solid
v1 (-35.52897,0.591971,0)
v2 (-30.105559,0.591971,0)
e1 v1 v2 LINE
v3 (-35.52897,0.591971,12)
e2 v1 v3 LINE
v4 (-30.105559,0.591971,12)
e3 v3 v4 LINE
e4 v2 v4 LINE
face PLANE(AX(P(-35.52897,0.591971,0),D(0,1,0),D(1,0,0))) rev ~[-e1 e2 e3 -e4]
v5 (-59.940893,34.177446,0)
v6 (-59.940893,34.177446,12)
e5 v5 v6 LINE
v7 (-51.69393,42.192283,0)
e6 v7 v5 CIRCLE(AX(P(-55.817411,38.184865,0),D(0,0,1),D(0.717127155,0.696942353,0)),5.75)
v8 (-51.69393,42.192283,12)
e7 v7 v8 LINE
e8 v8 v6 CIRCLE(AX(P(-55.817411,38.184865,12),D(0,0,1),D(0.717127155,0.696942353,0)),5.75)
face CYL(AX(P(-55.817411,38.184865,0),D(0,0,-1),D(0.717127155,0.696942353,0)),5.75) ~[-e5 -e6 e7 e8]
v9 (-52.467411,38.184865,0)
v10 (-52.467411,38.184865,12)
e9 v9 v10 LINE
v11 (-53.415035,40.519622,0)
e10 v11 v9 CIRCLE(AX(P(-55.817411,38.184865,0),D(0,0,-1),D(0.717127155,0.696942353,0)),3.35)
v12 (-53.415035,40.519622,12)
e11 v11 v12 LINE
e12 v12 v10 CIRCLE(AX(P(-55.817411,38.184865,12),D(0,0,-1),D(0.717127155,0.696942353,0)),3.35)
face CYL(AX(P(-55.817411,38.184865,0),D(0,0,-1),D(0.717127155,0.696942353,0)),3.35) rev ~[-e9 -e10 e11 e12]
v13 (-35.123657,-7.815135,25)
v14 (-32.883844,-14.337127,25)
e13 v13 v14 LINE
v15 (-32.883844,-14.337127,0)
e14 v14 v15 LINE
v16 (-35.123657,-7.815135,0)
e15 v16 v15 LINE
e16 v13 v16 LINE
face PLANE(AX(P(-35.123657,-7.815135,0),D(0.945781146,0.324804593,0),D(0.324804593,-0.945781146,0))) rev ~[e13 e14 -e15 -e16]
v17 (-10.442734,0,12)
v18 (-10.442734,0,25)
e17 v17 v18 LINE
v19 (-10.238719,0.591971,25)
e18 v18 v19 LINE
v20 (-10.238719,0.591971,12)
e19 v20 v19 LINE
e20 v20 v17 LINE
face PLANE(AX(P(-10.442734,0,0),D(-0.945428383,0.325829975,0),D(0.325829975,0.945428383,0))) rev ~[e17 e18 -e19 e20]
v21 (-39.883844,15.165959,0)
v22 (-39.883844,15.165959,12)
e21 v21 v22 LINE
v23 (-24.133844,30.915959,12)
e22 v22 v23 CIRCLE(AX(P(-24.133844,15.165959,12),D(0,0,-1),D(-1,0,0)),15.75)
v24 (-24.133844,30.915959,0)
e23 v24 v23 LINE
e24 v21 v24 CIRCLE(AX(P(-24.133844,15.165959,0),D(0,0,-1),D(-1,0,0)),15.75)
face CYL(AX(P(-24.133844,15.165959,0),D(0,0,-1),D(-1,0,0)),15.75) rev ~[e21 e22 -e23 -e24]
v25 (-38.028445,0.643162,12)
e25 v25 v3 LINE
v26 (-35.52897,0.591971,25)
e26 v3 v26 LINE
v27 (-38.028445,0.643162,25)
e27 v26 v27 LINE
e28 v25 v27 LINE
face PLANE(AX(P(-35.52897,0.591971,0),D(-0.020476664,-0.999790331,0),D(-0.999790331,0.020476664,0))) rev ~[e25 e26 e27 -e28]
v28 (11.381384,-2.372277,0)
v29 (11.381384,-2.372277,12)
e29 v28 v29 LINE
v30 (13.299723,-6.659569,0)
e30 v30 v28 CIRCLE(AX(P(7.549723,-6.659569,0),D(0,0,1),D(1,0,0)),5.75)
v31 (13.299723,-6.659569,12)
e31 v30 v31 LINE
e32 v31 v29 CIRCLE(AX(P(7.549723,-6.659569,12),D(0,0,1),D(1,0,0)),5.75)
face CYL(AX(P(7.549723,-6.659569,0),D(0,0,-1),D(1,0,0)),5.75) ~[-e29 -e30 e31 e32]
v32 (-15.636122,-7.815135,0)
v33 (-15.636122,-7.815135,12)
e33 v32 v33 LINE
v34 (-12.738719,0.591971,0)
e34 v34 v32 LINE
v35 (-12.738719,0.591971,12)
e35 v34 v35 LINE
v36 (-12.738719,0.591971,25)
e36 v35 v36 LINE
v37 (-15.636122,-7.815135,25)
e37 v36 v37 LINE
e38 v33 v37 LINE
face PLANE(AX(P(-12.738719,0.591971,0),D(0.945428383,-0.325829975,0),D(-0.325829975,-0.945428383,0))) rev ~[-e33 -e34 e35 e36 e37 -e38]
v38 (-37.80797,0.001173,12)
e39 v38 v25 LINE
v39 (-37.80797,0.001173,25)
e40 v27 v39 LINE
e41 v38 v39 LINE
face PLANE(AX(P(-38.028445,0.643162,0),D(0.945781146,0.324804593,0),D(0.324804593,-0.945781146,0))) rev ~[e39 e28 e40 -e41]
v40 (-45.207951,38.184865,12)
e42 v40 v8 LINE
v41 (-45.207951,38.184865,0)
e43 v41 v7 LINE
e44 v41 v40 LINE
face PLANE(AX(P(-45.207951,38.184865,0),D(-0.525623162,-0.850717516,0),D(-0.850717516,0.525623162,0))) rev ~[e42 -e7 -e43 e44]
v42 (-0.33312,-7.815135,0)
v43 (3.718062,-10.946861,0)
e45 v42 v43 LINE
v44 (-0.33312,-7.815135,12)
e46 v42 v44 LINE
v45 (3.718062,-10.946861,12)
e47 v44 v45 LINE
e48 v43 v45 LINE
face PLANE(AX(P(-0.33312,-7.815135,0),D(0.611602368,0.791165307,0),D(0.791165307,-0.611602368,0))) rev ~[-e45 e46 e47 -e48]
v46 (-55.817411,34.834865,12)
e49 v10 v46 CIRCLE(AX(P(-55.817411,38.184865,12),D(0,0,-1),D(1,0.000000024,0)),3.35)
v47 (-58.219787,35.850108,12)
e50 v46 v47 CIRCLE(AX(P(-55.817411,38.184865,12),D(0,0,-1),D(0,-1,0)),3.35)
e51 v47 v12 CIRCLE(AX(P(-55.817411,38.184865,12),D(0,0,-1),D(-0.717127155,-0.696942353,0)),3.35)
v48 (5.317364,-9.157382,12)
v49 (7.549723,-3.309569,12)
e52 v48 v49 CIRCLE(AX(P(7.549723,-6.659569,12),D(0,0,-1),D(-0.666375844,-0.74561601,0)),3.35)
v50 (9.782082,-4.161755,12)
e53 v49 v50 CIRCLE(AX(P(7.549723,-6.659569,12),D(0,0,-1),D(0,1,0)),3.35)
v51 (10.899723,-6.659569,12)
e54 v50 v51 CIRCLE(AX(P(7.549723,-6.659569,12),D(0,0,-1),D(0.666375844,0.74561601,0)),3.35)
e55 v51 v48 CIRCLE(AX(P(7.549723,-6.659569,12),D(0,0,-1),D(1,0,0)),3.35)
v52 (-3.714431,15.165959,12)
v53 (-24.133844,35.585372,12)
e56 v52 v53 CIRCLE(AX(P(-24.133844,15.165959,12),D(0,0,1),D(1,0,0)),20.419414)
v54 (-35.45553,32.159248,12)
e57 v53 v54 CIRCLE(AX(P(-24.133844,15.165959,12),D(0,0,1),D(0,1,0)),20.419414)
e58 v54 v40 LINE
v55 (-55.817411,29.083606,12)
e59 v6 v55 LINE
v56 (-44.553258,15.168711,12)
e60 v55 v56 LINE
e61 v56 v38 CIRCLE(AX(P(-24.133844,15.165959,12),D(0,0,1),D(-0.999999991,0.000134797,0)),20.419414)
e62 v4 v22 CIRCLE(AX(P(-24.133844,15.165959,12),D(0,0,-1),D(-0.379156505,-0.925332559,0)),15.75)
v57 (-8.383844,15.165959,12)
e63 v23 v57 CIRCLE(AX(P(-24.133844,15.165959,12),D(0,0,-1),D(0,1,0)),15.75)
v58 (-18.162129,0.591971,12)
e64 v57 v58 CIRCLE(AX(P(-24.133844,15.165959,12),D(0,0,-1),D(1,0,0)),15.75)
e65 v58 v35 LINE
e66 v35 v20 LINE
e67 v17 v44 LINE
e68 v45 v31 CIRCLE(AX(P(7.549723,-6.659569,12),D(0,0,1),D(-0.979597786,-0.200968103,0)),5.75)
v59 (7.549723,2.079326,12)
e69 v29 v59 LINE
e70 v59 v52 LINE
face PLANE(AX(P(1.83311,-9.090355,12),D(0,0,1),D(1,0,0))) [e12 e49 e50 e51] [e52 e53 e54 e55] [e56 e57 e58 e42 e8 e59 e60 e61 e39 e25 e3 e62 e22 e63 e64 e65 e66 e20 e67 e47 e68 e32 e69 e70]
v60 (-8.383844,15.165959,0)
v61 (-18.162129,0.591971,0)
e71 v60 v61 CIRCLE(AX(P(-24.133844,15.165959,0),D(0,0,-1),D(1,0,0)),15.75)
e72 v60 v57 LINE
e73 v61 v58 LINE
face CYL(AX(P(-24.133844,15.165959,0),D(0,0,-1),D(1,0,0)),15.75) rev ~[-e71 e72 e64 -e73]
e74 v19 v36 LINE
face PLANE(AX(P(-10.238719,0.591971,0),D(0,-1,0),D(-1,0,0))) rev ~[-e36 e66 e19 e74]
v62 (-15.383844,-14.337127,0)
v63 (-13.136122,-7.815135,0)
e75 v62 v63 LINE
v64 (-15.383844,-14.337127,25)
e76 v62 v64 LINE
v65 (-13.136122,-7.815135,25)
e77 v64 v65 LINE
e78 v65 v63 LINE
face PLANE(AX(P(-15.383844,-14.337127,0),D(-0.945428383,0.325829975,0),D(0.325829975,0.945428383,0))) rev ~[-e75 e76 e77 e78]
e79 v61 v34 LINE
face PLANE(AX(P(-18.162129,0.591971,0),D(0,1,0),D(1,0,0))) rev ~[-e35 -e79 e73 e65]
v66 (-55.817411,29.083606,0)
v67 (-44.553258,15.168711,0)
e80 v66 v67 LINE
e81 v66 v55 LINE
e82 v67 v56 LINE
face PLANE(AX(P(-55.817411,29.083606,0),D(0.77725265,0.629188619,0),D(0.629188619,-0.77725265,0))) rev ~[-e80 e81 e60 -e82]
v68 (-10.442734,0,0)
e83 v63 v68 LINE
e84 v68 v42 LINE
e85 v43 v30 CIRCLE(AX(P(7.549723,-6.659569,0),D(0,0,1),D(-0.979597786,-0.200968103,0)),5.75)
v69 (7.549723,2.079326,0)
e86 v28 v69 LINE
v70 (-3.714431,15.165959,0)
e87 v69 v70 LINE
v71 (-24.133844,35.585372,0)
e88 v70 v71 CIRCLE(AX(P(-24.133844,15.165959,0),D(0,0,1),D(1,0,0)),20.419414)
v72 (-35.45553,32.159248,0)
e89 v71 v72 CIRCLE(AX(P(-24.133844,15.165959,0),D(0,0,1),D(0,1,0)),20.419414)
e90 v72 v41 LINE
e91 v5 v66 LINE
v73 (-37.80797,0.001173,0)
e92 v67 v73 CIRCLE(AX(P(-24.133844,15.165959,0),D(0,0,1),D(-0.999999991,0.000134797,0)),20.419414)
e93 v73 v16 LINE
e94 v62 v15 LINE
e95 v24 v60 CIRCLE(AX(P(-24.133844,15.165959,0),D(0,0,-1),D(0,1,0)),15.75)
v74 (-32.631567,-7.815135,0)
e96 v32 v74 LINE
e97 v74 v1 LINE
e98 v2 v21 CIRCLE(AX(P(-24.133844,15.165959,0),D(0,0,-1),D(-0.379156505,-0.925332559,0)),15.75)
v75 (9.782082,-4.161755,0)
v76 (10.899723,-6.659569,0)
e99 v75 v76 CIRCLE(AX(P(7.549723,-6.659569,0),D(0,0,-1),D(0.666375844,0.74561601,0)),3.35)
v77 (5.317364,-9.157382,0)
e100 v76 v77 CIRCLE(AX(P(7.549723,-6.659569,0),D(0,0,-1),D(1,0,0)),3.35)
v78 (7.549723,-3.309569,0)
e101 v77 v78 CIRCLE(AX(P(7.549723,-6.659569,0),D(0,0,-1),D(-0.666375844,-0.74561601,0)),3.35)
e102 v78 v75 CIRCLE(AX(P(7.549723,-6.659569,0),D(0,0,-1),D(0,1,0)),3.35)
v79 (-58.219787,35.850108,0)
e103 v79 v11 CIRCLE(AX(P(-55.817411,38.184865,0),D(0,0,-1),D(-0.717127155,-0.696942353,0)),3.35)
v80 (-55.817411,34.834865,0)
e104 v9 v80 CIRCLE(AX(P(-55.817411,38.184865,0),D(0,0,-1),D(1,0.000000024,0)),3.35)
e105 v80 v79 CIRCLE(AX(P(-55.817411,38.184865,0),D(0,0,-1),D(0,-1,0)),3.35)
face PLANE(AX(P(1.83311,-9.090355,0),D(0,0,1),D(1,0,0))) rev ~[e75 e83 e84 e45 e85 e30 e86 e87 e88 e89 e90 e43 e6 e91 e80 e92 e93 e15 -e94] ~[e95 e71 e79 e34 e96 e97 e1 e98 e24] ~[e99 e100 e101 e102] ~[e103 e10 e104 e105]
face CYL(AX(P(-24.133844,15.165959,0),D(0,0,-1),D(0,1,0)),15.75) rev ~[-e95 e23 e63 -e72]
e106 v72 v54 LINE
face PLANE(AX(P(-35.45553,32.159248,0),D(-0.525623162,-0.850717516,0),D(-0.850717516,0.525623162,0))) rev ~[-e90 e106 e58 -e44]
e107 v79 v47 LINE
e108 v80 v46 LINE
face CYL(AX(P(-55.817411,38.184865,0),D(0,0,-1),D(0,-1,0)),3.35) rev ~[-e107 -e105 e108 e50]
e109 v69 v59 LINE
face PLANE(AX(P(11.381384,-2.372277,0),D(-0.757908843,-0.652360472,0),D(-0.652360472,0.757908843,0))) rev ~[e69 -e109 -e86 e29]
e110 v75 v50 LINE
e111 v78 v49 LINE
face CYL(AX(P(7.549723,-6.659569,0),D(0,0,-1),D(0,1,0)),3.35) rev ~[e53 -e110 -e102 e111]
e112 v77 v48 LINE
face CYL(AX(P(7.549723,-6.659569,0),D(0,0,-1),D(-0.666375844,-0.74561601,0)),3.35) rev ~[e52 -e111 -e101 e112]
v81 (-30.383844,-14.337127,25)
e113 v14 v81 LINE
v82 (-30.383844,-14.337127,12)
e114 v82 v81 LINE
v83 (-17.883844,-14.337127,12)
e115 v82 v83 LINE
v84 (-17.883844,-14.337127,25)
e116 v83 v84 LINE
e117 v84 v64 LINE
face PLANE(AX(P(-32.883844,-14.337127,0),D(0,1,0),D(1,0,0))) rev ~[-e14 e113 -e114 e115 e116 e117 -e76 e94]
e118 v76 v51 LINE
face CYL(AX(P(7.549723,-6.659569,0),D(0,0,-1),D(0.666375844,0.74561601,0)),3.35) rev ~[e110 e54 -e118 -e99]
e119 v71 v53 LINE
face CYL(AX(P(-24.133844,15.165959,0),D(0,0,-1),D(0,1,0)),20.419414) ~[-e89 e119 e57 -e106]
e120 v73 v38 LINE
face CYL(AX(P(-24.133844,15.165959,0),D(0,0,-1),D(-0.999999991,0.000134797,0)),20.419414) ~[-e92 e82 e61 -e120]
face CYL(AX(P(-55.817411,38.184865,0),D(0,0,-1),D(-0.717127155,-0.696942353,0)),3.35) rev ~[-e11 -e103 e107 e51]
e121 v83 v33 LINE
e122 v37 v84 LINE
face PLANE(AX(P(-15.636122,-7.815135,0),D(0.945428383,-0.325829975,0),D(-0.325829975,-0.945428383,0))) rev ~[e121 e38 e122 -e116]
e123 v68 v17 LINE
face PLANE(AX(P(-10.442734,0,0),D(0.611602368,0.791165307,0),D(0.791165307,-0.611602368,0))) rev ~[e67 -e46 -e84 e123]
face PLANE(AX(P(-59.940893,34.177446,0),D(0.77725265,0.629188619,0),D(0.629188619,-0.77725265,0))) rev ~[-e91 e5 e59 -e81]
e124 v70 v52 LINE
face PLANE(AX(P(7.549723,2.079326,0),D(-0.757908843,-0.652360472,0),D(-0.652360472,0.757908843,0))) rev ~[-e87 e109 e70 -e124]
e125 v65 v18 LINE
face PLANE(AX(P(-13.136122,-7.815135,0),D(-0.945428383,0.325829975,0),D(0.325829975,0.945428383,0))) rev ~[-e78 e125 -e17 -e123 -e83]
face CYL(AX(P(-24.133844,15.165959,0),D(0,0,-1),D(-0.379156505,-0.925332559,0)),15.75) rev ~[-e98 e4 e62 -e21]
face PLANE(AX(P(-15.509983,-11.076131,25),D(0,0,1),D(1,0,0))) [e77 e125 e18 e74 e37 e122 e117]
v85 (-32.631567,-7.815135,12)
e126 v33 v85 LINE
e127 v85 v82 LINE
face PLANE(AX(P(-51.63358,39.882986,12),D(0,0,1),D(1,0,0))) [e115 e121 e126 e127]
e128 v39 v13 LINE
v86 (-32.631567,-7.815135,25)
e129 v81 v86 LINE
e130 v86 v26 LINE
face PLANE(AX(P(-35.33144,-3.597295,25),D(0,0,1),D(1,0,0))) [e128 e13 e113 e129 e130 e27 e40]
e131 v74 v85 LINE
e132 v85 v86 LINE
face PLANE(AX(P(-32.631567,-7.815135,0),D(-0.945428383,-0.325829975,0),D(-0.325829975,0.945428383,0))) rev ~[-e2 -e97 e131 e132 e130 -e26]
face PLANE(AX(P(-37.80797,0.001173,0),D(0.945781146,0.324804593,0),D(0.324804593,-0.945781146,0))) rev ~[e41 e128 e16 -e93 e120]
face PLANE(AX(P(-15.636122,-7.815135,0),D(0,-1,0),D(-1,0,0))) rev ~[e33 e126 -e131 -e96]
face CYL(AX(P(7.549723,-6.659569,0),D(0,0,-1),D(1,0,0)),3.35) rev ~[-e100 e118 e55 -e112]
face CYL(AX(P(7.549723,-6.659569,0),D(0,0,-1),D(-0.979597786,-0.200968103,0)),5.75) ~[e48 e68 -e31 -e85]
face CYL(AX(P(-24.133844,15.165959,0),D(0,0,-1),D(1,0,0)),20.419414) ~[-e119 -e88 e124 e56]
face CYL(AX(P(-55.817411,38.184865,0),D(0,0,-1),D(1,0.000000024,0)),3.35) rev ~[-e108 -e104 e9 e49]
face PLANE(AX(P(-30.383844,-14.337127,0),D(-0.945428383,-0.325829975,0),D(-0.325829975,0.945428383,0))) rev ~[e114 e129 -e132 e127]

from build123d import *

# Parameters (mm, degrees)
F1_DEPTH = 12
F2_DEPTH = 25
F3_DEPTH = 12


# Not quite as in the source:
# - ends of sketch curves that miss each other by under 0.0002 mm in the source are joined


with BuildPart() as f1:
    # F0 (on Top) → F1 (new body)
    with BuildSketch(Plane.XY):
        with BuildLine():
            ThreePointArc((-53.4150354708, 40.5196217052), (-52.7133447942, 39.4447339634), (-52.4674114416, 38.1848648238))
            Line((-52.4674114416, 38.1848648238), (-50.0674114416, 38.1848649627))
            ThreePointArc((-50.0674114416, 38.1848649627), (-50.4895358529, 40.3473267799), (-51.6939302977, 42.1922833515))
            Line((-51.6939302977, 42.1922833515), (-53.4150354708, 40.5196217052))
        make_face()
        with BuildLine():
            Line((-50.0674114416, 38.1848649627), (-52.4674114416, 38.1848649047))
            ThreePointArc((-52.4674114416, 38.1848649047), (-53.4486037246, 35.8160571069), (-55.8174114415, 34.8348648238))
            Line((-55.8174114415, 34.8348648238), (-55.8174114415, 32.4348648238))
            ThreePointArc((-55.8174114415, 32.4348648238), (-51.7515474497, 34.119000832), (-50.0674114416, 38.1848649627))
        make_face()
        with BuildLine():
            ThreePointArc((-51.6939302977, 42.1922833515), (-50.4895358529, 40.3473267799), (-50.0674114416, 38.1848648238))
            Line((-50.0674114416, 38.1848648238), (-45.2079510631, 38.1848650801))
            Line((-45.2079510631, 38.1848650801), (-51.6939302977, 42.1922833515))
        make_face()
        with BuildLine():
            Line((-45.2079510631, 38.1848650801), (-50.0674114416, 38.1848649627))
            ThreePointArc((-50.0674114416, 38.1848649627), (-51.7515474497, 34.119000832), (-55.8174114415, 32.4348648238))
            Line((-55.8174114415, 32.4348648238), (-55.8174114414, 29.083605512))
            Line((-55.8174114414, 29.083605512), (-44.5532578407, 15.1687110318))
            ThreePointArc((-44.5532578407, 15.1687110318), (-42.1350647352, 24.8048651036), (-35.4555304308, 32.1592477879))
            Line((-35.4555304308, 32.1592477879), (-45.2079510631, 38.1848650801))
        make_face()
        with BuildLine():
            Line((-55.8174114415, 32.4348648238), (-55.8174114415, 34.8348648238))
            ThreePointArc((-55.8174114415, 34.8348648238), (-57.1214560051, 35.0990962362), (-58.2197874124, 35.8501079425))
            Line((-58.2197874124, 35.8501079425), (-59.9408925855, 34.1774462962))
            ThreePointArc((-59.9408925855, 34.1774462962), (-58.0556968865, 32.8883963526), (-55.8174114415, 32.4348648238))
        make_face()
        with BuildLine():
            ThreePointArc((-58.2197874124, 35.8501079425), (-58.1521683229, 40.5872407946), (-53.4150354708, 40.5196217052))
            Line((-53.4150354708, 40.5196217052), (-51.6939302977, 42.1922833515))
            ThreePointArc((-51.6939302977, 42.1922833515), (-59.8248299692, 42.3083459677), (-59.9408925855, 34.1774462962))
            Line((-59.9408925855, 34.1774462962), (-58.2197874124, 35.8501079425))
        make_face()
        with BuildLine():
            Line((-55.8174114414, 29.083605512), (-55.8174114415, 32.4348648238))
            ThreePointArc((-55.8174114415, 32.4348648238), (-58.0556968865, 32.8883963526), (-59.9408925855, 34.1774462962))
            Line((-59.9408925855, 34.1774462962), (-55.8174114414, 29.083605512))
        make_face()
        with BuildLine():
            ThreePointArc((-24.1338443596, 35.5853722206), (-30.0482104313, 34.7100811604), (-35.4555304308, 32.1592477879))
            ThreePointArc((-35.4555304308, 32.1592477879), (-42.1350647352, 24.8048651036), (-44.5532578407, 15.1687110318))
            Line((-44.5532578407, 15.1687110318), (-42.6338443592, 15.1659585535))
            Line((-42.6338443592, 15.1659585535), (-39.8838443592, 15.1659585535))
            ThreePointArc((-39.8838443592, 15.1659585535), (-35.270776163, 26.3028903571), (-24.1338443595, 30.9159585535))
            Line((-24.1338443595, 30.9159585535), (-24.1338443596, 35.5853722206))
        make_face()
        with BuildLine():
            ThreePointArc((-3.7144306922, 15.1659585535), (-9.6951384875, 29.6046644255), (-24.1338443596, 35.5853722206))
            Line((-24.1338443596, 35.5853722206), (-24.1338443595, 30.9159585535))
            ThreePointArc((-24.1338443595, 30.9159585535), (-12.9969125556, 26.3028903573), (-8.3838443592, 15.1659585535))
            Line((-8.3838443592, 15.1659585535), (-5.6338443592, 15.1659585535))
            Line((-5.6338443592, 15.1659585535), (-3.7144306922, 15.1659585535))
        make_face()
        with BuildLine():
            Line((-42.6338443592, 15.1659585535), (-44.5532578407, 15.1687110318))
            ThreePointArc((-44.5532578407, 15.1687110318), (-42.7914410163, 6.8685769492), (-37.807970261, 0.0011725238))
            Line((-37.807970261, 0.0011725238), (-38.0284454354, 0.643162408))
            Line((-38.0284454354, 0.643162408), (-35.5289696075, 0.5919707473))
            Line((-35.5289696075, 0.5919707473), (-42.6338443592, 15.1659585535))
        make_face()
        with BuildLine():
            Line((7.5497227229, 2.079326472), (-3.7144306922, 15.1659585535))
            Line((-3.7144306922, 15.1659585535), (-5.6338443592, 15.1659585535))
            Line((-5.6338443592, 15.1659585535), (-12.7387191109, 0.5919707473))
            Line((-12.7387191109, 0.5919707473), (-10.2387191109, 0.5919707473))
            Line((-10.2387191109, 0.5919707473), (-10.4427343672, 0))
            Line((-10.4427343672, 0), (-0.3331204375, -7.8151351762))
            Line((-0.3331204375, -7.8151351762), (1.9170354556, -7.8151351762))
            ThreePointArc((1.9170354556, -7.8151351762), (3.0939956275, -3.0251503303), (7.549722723, -0.909568585))
            Line((7.549722723, -0.909568585), (7.5497227229, 2.079326472))
        make_face()
        with BuildLine():
            Line((-39.8838443592, 15.1659585535), (-42.6338443592, 15.1659585535))
            Line((-42.6338443592, 15.1659585535), (-35.5289696075, 0.5919707473))
            Line((-35.5289696075, 0.5919707473), (-30.1055593076, 0.5919707473))
            ThreePointArc((-30.1055593076, 0.5919707473), (-37.2127780015, 6.3907665453), (-39.8838443592, 15.1659585535))
        make_face()
        Polygon((-38.0284454354, 0.643162408), (-37.807970261, 0.0011725238), (-35.1236572441, -7.8151351762), (-32.6315665225, -7.8151351762), (-35.5289696075, 0.5919707473), align=None)
        with BuildLine():
            Line((-5.6338443592, 15.1659585535), (-8.3838443592, 15.1659585535))
            ThreePointArc((-8.3838443592, 15.1659585535), (-11.054910717, 6.3907665453), (-18.1621294109, 0.5919707473))
            Line((-18.1621294109, 0.5919707473), (-12.7387191109, 0.5919707473))
            Line((-12.7387191109, 0.5919707473), (-5.6338443592, 15.1659585535))
        make_face()
        with BuildLine():
            Line((11.3813838275, -2.3722765282), (7.5497227229, 2.079326472))
            Line((7.5497227229, 2.079326472), (7.549722723, -0.909568585))
            ThreePointArc((7.549722723, -0.909568585), (9.6004019609, -1.2876774223), (11.3813838275, -2.3722765282))
        make_face()
        Polygon((-32.6315665225, -7.8151351762), (-35.1236572441, -7.8151351762), (-32.8838443592, -14.3371266833), (-30.3838443592, -14.3371266833), align=None)
        Polygon((-10.2387191109, 0.5919707473), (-12.7387191109, 0.5919707473), (-15.636122196, -7.8151351762), (-13.136122196, -7.8151351762), (-10.4427343672, 0), align=None)
        with BuildLine():
            ThreePointArc((11.3813838275, -2.3722765282), (9.6004019609, -1.2876774223), (7.549722723, -0.909568585))
            Line((7.549722723, -0.909568585), (7.549722723, -3.309568585))
            ThreePointArc((7.549722723, -3.309568585), (8.744466279, -3.5298580815), (9.7820818013, -4.1617549519))
            Line((9.7820818013, -4.1617549519), (11.3813838275, -2.3722765282))
        make_face()
        with BuildLine():
            Line((7.549722723, -3.309568585), (7.549722723, -0.909568585))
            ThreePointArc((7.549722723, -0.909568585), (3.0939956275, -3.0251503303), (1.9170354556, -7.8151351762))
            ThreePointArc((1.9170354556, -7.8151351762), (2.5652068364, -9.5261172721), (3.7180616186, -10.9468606418))
            Line((3.7180616186, -10.9468606418), (5.3173636448, -9.1573822181))
            ThreePointArc((5.3173636448, -9.1573822181), (4.4200122196, -5.464825029), (7.549722723, -3.309568585))
        make_face()
        with BuildLine():
            ThreePointArc((13.2997227231, -6.659568585), (12.7982725871, -4.3111171112), (11.3813838275, -2.3722765282))
            Line((11.3813838275, -2.3722765282), (9.7820818013, -4.1617549519))
            ThreePointArc((9.7820818013, -4.1617549519), (10.6075735134, -5.2913403351), (10.8997227231, -6.659568585))
            ThreePointArc((10.8997227231, -6.659568585), (8.917950973, -9.7174193754), (5.3173636448, -9.1573822181))
            Line((5.3173636448, -9.1573822181), (3.7180616186, -10.9468606418))
            ThreePointArc((3.7180616186, -10.9468606418), (9.8981741968, -11.908118449), (13.2997227231, -6.659568585))
        make_face()
        Polygon((-24.1338443592, -7.8151351762), (-32.6315665225, -7.8151351762), (-30.3838443592, -14.3371266833), (-24.1338443592, -14.3371266833), (-24.1338443592, -7.8529477167), align=None)
        Polygon((-13.136122196, -7.8151351762), (-15.636122196, -7.8151351762), (-17.8838443592, -14.3371266833), (-15.3838443592, -14.3371266833), align=None)
        Polygon((-17.8838443592, -14.3371266833), (-15.636122196, -7.8151351762), (-24.1338443592, -7.8151351762), (-24.1338443592, -7.8529477167), (-24.1338443592, -14.3371266833), align=None)
    extrude(amount=F1_DEPTH)

    # F0 (on Top) → F2 (join)
    with BuildSketch(Plane.XY):
        Polygon((-38.0284454354, 0.643162408), (-37.807970261, 0.0011725238), (-35.1236572441, -7.8151351762), (-32.6315665225, -7.8151351762), (-35.5289696075, 0.5919707473), align=None)
        Polygon((-32.6315665225, -7.8151351762), (-35.1236572441, -7.8151351762), (-32.8838443592, -14.3371266833), (-30.3838443592, -14.3371266833), align=None)
        Polygon((-13.136122196, -7.8151351762), (-15.636122196, -7.8151351762), (-17.8838443592, -14.3371266833), (-15.3838443592, -14.3371266833), align=None)
        Polygon((-10.2387191109, 0.5919707473), (-12.7387191109, 0.5919707473), (-15.636122196, -7.8151351762), (-13.136122196, -7.8151351762), (-10.4427343672, 0), align=None)
    extrude(amount=F2_DEPTH)

    # F0 (on Top) → F3 (join)
    with BuildSketch(Plane.XY):
        with BuildLine():
            ThreePointArc((3.7180616186, -10.9468606418), (2.5652068364, -9.5261172721), (1.9170354556, -7.8151351762))
            Line((1.9170354556, -7.8151351762), (-0.3331204375, -7.8151351762))
            Line((-0.3331204375, -7.8151351762), (3.7180616186, -10.9468606418))
        make_face()
    extrude(amount=F3_DEPTH)


solid = f1.part
